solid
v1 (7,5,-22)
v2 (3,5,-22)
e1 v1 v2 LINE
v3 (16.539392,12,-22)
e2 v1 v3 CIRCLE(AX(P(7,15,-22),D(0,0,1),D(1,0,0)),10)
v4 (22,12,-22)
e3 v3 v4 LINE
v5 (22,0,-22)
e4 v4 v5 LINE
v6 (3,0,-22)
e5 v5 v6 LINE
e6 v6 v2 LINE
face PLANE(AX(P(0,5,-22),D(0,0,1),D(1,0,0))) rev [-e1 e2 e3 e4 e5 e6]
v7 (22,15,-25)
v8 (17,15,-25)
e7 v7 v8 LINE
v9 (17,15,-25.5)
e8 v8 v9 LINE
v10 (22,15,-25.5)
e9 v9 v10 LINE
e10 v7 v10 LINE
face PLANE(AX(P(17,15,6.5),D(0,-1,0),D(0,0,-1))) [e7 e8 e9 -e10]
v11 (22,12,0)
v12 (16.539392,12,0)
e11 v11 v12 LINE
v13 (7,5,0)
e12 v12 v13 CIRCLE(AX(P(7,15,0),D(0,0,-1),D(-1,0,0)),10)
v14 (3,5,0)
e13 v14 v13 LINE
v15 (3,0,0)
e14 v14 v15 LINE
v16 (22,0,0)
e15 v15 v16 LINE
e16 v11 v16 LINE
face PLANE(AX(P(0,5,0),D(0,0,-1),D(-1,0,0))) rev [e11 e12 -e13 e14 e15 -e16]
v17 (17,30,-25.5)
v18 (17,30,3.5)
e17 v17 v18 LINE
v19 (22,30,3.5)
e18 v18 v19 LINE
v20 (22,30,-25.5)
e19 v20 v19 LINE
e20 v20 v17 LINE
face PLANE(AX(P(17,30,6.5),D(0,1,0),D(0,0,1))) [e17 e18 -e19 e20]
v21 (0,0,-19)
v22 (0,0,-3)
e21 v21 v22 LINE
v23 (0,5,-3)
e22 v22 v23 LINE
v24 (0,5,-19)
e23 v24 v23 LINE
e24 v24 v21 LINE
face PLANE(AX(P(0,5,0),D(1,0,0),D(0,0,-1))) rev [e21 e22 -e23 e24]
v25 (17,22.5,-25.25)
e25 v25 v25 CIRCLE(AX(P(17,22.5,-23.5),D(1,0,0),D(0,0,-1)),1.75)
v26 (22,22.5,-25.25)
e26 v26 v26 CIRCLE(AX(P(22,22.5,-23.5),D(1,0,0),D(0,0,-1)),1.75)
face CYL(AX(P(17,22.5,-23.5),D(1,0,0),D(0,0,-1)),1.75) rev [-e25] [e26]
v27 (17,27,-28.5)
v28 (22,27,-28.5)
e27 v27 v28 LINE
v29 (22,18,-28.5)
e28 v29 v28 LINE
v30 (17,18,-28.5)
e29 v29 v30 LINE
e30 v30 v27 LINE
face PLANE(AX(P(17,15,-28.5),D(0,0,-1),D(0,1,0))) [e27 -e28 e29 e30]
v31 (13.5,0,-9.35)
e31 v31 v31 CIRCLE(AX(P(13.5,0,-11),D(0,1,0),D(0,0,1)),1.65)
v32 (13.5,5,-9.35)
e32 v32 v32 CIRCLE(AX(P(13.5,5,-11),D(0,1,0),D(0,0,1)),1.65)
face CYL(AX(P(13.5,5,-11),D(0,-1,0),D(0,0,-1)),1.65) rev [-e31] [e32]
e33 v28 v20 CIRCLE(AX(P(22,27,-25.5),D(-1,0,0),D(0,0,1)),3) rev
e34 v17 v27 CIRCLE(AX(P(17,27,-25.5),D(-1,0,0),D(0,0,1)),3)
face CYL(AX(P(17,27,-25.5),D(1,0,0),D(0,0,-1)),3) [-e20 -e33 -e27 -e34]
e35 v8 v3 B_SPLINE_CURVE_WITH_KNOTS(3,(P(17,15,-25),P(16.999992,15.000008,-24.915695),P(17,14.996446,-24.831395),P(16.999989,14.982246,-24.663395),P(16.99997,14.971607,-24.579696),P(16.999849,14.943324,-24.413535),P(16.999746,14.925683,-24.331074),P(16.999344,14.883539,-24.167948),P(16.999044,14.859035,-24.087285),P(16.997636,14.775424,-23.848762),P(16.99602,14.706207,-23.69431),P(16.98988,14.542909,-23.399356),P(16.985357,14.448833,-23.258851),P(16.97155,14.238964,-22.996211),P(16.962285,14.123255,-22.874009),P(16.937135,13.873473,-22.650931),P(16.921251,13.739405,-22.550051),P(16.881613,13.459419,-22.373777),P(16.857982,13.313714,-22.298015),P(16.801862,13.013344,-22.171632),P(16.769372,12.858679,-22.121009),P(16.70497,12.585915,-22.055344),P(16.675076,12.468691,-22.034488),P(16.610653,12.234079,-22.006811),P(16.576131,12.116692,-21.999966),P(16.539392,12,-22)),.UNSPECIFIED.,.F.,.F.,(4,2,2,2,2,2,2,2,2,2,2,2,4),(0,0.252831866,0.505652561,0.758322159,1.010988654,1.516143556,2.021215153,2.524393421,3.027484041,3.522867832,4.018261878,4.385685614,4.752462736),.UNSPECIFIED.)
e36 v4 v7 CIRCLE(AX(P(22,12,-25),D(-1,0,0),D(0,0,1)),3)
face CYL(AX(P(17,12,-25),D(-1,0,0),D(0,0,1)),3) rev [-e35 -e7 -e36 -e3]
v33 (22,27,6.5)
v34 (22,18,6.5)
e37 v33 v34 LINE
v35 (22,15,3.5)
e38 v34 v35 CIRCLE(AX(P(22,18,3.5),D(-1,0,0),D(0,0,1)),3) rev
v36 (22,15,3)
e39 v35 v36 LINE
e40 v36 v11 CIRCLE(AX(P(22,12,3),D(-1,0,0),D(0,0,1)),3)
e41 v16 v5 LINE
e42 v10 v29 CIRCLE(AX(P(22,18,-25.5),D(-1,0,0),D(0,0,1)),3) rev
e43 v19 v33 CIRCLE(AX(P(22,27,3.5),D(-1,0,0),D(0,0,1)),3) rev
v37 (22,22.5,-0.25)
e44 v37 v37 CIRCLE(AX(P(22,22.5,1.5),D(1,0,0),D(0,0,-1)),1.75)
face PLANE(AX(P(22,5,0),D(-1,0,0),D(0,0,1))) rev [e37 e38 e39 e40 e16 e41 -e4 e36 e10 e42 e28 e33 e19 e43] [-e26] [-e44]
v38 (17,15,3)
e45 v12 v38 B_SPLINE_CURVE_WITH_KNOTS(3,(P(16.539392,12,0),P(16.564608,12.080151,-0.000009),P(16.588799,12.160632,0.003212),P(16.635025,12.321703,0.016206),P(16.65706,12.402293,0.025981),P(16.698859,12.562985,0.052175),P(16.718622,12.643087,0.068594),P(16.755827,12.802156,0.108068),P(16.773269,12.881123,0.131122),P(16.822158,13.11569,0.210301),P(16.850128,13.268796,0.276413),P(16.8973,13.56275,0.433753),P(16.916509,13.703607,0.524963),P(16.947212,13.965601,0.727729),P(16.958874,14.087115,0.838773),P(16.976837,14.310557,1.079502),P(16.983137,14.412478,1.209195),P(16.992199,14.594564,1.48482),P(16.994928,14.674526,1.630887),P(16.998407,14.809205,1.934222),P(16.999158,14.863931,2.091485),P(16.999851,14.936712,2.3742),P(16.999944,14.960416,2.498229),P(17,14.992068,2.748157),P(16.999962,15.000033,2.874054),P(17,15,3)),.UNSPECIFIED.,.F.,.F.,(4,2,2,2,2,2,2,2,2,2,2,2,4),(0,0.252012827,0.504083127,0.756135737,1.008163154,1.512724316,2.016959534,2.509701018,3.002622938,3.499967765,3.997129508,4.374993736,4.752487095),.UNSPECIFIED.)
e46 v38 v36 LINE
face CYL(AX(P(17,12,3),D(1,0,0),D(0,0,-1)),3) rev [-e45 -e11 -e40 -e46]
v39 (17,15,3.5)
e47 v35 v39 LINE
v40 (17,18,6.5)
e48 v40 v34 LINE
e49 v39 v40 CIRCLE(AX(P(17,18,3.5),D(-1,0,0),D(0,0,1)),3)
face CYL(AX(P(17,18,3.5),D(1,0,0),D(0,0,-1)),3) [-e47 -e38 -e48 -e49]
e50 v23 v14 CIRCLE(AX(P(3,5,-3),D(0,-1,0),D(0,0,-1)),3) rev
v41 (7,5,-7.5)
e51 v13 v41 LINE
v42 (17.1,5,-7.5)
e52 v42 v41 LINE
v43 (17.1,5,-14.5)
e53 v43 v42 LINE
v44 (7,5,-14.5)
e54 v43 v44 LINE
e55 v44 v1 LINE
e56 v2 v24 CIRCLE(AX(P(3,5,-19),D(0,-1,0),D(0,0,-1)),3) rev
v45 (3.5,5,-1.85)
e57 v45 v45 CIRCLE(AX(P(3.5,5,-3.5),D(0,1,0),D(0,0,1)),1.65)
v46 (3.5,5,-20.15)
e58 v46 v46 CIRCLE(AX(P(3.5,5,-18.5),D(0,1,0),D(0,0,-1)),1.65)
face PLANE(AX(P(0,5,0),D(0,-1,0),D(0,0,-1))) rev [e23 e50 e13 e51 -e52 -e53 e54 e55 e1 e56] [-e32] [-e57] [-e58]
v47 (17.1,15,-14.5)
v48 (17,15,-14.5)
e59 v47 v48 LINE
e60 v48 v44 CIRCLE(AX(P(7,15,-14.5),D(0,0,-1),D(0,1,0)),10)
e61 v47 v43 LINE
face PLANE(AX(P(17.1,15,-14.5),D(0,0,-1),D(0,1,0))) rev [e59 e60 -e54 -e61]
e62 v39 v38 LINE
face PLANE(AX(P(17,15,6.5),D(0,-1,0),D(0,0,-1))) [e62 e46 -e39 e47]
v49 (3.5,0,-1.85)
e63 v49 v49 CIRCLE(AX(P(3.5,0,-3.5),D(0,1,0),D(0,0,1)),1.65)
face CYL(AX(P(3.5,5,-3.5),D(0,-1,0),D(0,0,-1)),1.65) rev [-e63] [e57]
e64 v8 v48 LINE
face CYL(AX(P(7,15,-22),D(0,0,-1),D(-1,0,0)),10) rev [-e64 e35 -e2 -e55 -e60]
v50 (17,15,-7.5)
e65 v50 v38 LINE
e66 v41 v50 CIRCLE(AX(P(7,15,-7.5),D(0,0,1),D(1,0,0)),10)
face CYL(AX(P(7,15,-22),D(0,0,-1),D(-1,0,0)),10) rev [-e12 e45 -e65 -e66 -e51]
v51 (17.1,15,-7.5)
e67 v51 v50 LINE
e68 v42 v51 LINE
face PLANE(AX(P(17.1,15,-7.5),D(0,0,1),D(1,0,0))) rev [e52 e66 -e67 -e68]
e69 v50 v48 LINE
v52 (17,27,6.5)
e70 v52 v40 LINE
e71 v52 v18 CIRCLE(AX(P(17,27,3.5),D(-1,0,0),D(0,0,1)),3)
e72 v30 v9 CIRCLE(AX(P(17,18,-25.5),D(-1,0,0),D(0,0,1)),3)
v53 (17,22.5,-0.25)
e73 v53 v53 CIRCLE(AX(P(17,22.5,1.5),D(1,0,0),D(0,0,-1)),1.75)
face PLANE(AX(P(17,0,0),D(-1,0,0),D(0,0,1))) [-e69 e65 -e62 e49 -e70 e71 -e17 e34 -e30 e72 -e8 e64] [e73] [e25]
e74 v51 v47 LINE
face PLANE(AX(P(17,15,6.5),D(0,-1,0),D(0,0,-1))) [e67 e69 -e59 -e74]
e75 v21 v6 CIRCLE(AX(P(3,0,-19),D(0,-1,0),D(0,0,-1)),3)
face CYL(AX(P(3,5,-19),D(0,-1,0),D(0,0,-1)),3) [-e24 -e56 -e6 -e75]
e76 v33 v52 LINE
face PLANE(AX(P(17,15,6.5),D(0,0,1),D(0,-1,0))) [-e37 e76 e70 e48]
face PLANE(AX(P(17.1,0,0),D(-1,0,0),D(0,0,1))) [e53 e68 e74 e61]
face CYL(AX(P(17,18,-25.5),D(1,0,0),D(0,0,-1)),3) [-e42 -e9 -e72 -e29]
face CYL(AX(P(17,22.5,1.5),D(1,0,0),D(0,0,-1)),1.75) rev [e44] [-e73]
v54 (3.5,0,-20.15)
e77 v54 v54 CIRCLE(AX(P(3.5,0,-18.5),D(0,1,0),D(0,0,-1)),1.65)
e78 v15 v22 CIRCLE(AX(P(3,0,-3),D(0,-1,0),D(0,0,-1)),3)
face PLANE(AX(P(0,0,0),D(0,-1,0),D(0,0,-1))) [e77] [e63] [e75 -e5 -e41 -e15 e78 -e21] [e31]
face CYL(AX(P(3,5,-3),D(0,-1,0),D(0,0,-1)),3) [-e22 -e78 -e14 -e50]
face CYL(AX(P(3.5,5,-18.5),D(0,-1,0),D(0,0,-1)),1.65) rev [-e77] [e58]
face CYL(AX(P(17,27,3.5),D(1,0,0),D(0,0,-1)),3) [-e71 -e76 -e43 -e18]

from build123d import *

# Parameters (mm, degrees)
SKETCH1_W                = 22
SKETCH1_H                = 22
SKETCH1_R                = 1.65
BOSS_EXTRUDE1_DEPTH      = 5
SKETCH2_W                = 5
SKETCH2_H                = 22
BOSS_EXTRUDE2_DEPTH      = 10
SKETCH3_W                = 7
SKETCH3_H                = 10
CUT_EXTRUDE1_DEPTH       = 0.1
FILLET1_R                = 10
SKETCH5_W                = 35
SKETCH5_H                = 15
SKETCH5_R                = 1.75
CHANGE_THIS_SKETCH_DEPTH = 5
FILLET2_R                = 3


with BuildPart() as part:
    # Sketch1 → Boss-Extrude1 (new body)
    with BuildSketch(Plane(origin=(0, 0, 0), x_dir=(1, 0, 0), z_dir=(0, 1, 0))):
        with Locations((11, 11)):
            Rectangle(SKETCH1_W, SKETCH1_H)
        with Locations(Location((13.5, 11, 0), (0, 0, 270))):
            Circle(SKETCH1_R, mode=Mode.SUBTRACT)
        with Locations(Location((3.5, 3.5, 0), (0, 0, 270))):
            Circle(SKETCH1_R, mode=Mode.SUBTRACT)
        with Locations(Location((3.5, 18.5, 0), (0, 0, 90))):
            Circle(SKETCH1_R, mode=Mode.SUBTRACT)
    extrude(amount=BOSS_EXTRUDE1_DEPTH)

    # Sketch2 → Boss-Extrude2 (add)
    with BuildSketch(Plane(origin=(0, 5, 0), x_dir=(1, 0, 0), z_dir=(0, 1, 0))):
        with Locations((19.5, 11)):
            Rectangle(SKETCH2_W, SKETCH2_H)
    extrude(amount=BOSS_EXTRUDE2_DEPTH)

    # Sketch3 → Cut-Extrude1 (cut)
    with BuildSketch(Plane.ZY.offset(-17)):
        with Locations((-11, 10)):
            Rectangle(SKETCH3_W, SKETCH3_H)
    extrude(amount=-CUT_EXTRUDE1_DEPTH, mode=Mode.SUBTRACT)

    # Fillet1
    fillet1_edges = [part.edges().sort_by_distance(p)[0] for p in [
        (17, 5, -18.25),
        (17, 5, -3.75),
    ]]
    fillet(fillet1_edges, radius=FILLET1_R - 0.0001)  # a hair under: the kernel refuses the full size

    # Sketch5 → CHANGE THIS SKETCH (add)
    with BuildSketch(Plane(origin=(22, 0, 0), x_dir=(0, 0, -1), z_dir=(1, 0, 0))):
        with Locations((11, 22.5)):
            Rectangle(SKETCH5_W, SKETCH5_H)
        with Locations((23.5, 22.5)):
            Circle(SKETCH5_R, mode=Mode.SUBTRACT)
        with Locations((-1.5, 22.5)):
            Circle(SKETCH5_R, mode=Mode.SUBTRACT)
    extrude(amount=-CHANGE_THIS_SKETCH_DEPTH)

    # Fillet2
    fillet2_edges = [part.edges().sort_by_distance(p)[0] for p in [
        (19.5, 15, -22),
        (19.5, 15, 0),
        (0, 2.5, -22),
        (19.5, 15, 6.5),
        (19.5, 30, 6.5),
        (19.5, 30, -28.5),
        (19.5, 15, -28.5),
        (0, 2.5, 0),
    ]]
    fillet(fillet2_edges, radius=FILLET2_R)


solid = part.part
